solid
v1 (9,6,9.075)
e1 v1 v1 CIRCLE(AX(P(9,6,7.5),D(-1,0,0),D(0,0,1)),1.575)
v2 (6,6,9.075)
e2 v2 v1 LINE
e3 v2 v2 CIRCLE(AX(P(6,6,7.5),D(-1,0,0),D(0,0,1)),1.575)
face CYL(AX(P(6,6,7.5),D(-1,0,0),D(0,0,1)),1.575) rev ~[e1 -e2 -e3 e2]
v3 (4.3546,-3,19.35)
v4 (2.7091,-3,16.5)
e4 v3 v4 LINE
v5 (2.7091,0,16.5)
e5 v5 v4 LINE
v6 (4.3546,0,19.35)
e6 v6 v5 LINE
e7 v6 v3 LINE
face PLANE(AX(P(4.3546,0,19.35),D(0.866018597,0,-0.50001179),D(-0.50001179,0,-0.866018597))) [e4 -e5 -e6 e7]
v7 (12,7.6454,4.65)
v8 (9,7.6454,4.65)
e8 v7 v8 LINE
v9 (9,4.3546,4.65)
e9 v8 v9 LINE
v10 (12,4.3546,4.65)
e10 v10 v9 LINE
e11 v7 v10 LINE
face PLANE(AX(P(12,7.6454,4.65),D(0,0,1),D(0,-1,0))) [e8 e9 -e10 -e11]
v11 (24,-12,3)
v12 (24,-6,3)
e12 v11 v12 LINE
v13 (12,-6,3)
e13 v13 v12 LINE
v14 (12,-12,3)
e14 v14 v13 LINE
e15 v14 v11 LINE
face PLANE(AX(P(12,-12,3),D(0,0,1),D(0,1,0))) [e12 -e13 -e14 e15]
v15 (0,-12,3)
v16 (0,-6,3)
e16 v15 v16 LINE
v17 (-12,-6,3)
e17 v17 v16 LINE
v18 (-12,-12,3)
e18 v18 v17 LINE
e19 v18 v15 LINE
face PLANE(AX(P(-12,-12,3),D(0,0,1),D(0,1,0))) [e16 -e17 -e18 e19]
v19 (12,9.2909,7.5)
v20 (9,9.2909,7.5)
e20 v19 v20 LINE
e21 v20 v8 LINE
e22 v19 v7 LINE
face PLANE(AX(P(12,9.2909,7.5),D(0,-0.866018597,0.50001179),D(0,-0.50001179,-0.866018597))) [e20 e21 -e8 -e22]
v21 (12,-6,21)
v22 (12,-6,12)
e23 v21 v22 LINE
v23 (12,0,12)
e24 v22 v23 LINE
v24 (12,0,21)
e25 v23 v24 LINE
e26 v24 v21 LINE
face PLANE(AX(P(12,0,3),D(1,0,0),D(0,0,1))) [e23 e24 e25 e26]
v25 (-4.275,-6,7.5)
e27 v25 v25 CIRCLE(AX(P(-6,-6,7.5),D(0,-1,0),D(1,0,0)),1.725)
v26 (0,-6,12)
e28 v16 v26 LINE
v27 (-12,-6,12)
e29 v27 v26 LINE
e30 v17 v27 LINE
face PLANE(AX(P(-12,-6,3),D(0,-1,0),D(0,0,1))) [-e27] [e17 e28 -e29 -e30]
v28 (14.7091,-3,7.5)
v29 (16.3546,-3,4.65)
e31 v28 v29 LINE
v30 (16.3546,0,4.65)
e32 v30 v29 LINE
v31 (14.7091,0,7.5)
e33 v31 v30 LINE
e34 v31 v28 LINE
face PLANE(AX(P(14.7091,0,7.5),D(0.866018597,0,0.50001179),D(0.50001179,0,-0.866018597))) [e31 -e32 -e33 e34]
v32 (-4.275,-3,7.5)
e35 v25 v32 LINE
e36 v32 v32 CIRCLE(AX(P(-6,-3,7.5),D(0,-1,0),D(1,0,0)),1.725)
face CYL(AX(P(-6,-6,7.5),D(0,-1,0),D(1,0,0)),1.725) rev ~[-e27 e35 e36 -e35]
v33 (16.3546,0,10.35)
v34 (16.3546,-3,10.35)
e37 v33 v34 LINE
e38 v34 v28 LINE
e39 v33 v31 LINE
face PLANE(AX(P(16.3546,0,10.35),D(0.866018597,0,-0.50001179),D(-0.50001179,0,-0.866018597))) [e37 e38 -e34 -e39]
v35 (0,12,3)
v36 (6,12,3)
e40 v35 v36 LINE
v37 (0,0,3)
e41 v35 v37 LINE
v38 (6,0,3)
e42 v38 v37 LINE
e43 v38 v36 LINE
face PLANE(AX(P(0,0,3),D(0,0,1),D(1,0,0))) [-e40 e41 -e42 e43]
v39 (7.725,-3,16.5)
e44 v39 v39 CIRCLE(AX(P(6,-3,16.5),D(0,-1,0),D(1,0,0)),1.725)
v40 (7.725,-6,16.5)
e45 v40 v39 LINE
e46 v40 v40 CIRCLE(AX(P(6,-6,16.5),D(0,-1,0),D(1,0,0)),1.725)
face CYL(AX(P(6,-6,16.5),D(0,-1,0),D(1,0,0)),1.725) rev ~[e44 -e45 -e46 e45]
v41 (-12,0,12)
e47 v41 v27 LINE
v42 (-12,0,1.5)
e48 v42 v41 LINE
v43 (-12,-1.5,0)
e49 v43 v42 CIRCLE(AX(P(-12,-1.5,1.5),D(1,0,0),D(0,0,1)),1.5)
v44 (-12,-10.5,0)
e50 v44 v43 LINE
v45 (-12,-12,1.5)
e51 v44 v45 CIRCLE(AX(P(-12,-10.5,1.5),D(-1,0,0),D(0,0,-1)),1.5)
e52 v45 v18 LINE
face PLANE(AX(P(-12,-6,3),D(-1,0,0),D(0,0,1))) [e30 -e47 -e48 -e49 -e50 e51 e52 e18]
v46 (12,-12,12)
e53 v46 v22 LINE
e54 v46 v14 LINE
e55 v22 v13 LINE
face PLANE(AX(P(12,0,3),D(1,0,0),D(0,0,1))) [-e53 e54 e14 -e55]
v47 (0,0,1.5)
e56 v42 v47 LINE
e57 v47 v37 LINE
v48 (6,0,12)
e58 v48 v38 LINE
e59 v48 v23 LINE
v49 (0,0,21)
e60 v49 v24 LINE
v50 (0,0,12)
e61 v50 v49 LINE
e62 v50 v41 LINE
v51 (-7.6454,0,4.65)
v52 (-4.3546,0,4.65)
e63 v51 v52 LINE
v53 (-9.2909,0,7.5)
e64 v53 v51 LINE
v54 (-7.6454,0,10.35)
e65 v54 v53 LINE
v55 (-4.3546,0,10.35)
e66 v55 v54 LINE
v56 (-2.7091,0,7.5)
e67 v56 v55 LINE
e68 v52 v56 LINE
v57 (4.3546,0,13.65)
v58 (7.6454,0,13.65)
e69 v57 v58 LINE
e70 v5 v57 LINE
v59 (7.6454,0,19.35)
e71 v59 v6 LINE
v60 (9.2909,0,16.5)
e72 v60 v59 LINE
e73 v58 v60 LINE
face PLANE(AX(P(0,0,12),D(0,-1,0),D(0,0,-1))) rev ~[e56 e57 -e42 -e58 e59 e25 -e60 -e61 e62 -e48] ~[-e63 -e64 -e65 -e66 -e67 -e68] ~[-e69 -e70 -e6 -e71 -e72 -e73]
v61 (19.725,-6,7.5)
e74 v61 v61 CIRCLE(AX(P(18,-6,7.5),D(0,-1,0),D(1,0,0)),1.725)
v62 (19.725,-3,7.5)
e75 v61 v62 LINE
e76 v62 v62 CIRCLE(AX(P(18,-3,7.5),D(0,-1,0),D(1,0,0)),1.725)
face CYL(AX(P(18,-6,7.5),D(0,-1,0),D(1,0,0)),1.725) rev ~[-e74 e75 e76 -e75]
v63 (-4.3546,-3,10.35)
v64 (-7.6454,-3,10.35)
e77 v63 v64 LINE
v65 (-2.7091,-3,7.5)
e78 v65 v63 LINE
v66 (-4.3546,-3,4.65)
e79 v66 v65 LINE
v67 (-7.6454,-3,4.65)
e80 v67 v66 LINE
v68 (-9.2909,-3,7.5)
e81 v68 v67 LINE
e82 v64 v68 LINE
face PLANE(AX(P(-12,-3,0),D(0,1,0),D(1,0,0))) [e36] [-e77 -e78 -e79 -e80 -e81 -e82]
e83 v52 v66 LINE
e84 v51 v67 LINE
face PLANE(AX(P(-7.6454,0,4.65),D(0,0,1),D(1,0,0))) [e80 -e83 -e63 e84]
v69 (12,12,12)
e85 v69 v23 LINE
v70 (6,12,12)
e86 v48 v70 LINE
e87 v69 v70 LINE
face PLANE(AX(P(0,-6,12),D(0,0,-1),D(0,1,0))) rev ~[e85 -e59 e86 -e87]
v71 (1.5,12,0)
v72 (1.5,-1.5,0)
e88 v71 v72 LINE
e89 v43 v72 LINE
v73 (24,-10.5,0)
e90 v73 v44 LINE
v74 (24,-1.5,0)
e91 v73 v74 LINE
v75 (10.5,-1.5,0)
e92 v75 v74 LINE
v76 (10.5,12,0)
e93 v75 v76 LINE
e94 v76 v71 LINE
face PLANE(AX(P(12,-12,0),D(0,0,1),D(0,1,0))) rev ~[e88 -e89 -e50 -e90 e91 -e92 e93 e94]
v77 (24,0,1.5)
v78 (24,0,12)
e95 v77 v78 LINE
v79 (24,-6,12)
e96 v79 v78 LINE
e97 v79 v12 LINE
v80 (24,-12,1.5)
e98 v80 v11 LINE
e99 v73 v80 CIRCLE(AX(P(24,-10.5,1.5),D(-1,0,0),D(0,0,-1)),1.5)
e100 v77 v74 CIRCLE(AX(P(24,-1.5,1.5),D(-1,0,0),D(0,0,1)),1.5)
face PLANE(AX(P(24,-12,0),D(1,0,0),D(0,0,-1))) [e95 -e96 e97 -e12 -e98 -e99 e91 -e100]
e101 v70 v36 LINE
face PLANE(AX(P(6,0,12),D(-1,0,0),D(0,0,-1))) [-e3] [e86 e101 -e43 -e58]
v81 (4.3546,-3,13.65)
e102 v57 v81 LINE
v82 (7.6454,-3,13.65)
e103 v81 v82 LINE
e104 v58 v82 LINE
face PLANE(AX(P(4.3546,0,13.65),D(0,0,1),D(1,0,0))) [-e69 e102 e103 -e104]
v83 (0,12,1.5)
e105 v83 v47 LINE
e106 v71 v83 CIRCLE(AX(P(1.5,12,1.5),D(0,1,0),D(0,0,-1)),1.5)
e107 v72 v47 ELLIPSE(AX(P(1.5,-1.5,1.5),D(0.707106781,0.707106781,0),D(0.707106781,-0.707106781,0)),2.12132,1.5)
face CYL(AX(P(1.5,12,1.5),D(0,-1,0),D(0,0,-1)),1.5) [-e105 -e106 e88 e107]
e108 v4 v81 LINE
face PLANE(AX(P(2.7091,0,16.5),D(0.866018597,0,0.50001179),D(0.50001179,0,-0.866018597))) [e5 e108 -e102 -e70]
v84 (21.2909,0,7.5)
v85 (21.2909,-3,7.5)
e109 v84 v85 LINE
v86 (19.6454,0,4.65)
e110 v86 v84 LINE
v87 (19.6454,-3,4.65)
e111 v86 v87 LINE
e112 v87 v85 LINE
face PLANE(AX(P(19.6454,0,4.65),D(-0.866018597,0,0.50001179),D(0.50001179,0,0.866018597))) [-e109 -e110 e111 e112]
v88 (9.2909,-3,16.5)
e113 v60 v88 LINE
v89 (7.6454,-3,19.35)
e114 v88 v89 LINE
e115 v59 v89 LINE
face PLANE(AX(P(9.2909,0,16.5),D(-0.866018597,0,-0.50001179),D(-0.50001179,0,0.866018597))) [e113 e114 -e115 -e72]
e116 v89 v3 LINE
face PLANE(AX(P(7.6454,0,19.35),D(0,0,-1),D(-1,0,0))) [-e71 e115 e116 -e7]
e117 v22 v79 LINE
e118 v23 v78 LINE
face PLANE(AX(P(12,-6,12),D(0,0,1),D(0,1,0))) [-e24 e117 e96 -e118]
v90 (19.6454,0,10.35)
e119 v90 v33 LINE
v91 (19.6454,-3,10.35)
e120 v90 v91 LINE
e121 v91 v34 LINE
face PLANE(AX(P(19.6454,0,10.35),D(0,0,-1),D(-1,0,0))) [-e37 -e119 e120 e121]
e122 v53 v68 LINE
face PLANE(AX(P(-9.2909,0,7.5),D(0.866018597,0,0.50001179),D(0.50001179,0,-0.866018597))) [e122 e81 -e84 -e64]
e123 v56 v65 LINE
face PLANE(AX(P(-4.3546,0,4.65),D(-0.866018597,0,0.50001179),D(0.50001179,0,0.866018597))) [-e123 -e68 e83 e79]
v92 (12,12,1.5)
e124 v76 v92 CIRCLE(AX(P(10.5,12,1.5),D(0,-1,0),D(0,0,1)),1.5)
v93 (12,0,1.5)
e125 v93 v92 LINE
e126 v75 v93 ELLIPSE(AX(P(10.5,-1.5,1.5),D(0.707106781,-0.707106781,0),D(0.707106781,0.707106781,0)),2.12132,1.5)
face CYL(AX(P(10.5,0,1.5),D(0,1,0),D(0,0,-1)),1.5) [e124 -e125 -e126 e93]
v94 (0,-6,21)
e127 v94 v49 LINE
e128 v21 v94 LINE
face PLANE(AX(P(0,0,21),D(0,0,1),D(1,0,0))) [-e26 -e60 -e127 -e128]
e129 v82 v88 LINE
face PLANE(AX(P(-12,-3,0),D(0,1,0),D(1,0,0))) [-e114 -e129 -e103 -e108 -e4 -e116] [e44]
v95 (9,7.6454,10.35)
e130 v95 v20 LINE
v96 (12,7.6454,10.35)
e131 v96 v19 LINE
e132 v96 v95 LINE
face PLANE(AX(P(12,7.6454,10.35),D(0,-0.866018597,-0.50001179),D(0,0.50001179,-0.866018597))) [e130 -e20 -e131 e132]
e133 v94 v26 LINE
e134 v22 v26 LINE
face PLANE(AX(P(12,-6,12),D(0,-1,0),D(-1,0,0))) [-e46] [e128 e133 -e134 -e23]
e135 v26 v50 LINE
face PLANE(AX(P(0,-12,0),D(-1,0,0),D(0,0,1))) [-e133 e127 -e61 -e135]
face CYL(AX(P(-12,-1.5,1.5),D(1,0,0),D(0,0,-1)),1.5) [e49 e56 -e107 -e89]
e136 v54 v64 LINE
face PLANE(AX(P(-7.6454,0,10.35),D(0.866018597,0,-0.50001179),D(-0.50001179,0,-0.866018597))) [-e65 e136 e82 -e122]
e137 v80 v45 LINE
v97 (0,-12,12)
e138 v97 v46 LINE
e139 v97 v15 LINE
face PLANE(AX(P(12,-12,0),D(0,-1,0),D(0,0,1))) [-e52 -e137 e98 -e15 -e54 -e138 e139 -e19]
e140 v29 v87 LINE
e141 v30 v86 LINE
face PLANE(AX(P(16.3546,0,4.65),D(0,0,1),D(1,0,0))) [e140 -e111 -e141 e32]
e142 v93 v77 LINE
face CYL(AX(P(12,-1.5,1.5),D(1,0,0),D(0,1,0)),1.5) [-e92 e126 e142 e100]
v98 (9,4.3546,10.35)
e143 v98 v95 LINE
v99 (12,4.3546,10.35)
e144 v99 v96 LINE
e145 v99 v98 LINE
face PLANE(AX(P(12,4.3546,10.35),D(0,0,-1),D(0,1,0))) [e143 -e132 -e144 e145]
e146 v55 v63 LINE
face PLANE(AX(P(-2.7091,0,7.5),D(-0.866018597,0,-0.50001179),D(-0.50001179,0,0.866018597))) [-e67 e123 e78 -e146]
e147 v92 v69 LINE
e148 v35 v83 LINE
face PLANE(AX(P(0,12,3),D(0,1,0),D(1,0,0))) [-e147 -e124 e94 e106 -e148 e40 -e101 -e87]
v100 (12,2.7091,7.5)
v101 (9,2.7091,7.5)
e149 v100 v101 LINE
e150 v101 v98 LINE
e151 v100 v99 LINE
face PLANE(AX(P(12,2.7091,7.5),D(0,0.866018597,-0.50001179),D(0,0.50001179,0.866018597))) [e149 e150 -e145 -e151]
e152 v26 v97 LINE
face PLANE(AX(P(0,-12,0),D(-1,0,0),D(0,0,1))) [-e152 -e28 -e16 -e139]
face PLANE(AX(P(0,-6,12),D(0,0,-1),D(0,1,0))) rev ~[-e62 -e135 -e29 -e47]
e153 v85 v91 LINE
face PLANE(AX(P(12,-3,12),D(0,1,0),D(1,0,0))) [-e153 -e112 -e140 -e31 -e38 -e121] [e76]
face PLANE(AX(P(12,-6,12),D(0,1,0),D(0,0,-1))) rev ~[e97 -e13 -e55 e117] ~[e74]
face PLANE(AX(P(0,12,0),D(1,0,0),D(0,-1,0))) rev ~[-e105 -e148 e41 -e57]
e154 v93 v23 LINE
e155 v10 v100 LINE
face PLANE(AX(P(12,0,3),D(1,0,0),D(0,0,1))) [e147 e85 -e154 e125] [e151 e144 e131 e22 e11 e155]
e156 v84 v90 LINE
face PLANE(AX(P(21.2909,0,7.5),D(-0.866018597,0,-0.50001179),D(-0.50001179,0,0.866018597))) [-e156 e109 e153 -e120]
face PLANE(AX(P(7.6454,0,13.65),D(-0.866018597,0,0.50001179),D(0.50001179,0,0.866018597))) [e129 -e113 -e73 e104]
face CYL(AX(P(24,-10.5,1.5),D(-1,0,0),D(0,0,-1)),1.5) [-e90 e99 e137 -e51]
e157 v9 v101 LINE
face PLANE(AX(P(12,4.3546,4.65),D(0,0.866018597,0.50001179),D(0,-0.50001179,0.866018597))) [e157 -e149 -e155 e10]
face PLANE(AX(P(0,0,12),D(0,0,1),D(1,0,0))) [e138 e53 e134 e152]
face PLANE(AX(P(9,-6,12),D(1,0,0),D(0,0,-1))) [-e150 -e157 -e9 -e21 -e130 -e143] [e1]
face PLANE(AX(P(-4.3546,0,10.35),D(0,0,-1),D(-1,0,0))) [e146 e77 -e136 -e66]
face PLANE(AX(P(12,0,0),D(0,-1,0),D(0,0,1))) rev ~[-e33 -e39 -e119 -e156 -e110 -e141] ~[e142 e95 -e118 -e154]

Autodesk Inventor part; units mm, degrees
ref_plane "YZ Plane" through (0, 0, 0) normal (1, 0, 0) x (0, 1, 0)
ref_plane "XZ Plane" through (0, 0, 0) normal (0, 1, 0) x (-1, 0, 0)
ref_plane "XY Plane" through (0, 0, 0) normal (0, 0, 1) x (1, 0, 0)
sketch "Sketch1" plane through (0, 0, 0) normal (0, 0, 1) x (1, 0, 0)
  line L0 (0, 0) -> (12, 0)
  line L1 (12, 0) -> (12, 12)
  line L2 (12, 12) -> (0, 12)
  line L3 (0, 12) -> (0, 0)
  line L4 (12, 0) -> (0, 0)
  line L5 (0, 0) -> (0, -12)
  line L6 (0, -12) -> (12, -12)
  line L7 (12, -12) -> (12, 0)
  line L8 (12, 0) -> (24, 0)
  line L9 (24, 0) -> (24, -12)
  line L10 (24, -12) -> (12, -12)
  line L11 (12, -12) -> (12, 0)
  line L12 (0, -12) -> (-12, -12)
  line L13 (-12, -12) -> (-12, 0)
  line L14 (-12, 0) -> (0, 0)
  line L15 (0, 0) -> (0, -12)
  line L16 (0, -12) -> (12, -12)
  line L17 (12, -12) -> (12, -24)
  line L18 (12, -24) -> (0, -24)
  line L19 (0, -24) -> (0, -12)
  dimension "d0" = 12
  dimension "d1" = 12
  dimension "d2" = 12
  dimension "d3" = 12
  dimension "d4" = 12
  dimension "d5" = 12
  dimension "d6" = 12
  dimension "d7" = 12
  dimension "d8" = 12
  dimension "d9" = 12
extrude "Extrusion1" add sketch "Sketch1" along normal blind 3
sketch "Sketch2" plane through (0, 0, 3) normal (0, 0, 1) x (1, 0, 0)
  line L0 (-12, 0) -> (-12, -12) projected
  line L1 (-12, -12) -> (-12, -6)
  line L2 (-12, -6) -> (0, -6)
  line L3 (-12, -12) -> (0, -12) projected
  line L4 (0, -6) -> (0, -12)
  line L5 (0, -12) -> (-12, -12)
  line L6 (12, -24) -> (12, -12) projected
  line L7 (12, -12) -> (12, -6)
  line L8 (12, -6) -> (24, -6)
  line L9 (24, -12) -> (24, 0) projected
  line L10 (12, -12) -> (24, -12) projected
  line L11 (24, -6) -> (24, -12)
  line L12 (24, -12) -> (12, -12)
  line L13 (0, 0) -> (0, -6)
  line L14 (12, 0) -> (12, 12) projected
  line L15 (0, 0) -> (12, 0)
  line L16 (12, 0) -> (12, -6)
  line L17 (12, -12) -> (0, -12)
  line L18 (0, 12) -> (0, 0) projected
  line L19 (0, 0) -> (0, 12)
  line L20 (0, 12) -> (6, 12)
  line L21 (12, 12) -> (0, 12) projected
  line L22 (6, 12) -> (6, 0)
  line L23 (6, 0) -> (0, 0)
  line L24 (0, -12) -> (0, -24) projected
  line L25 (0, -12) -> (0, -24)
  line L26 (0, -24) -> (6, -24)
  line L27 (0, -24) -> (12, -24) projected
  line L28 (6, -24) -> (6, -12)
  line L29 (6, -12) -> (0, -12)
  dimension "d12" = 6
  dimension "d13" = 12
extrude "Extrusion2" add sketch "Sketch2" along normal blind 9 contours L2 L4 L3 L0 | L13 L15 L16 L7 L17 L4 | L17 L28 L26 L24 | L18 L20 L22 L15 | L7 L8 L9 L10
sketch "Sketch3" plane through (0, 0, 12) normal (0, 0, 1) x (1, 0, 0)
  line L0 (0, -6) -> (12, -6)
  line L1 (12, -12) -> (6, -12) projected
  line L2 (12, -6) -> (12, -12)
  line L3 (0, -12) -> (0, -24) projected
  line L4 (12, -12) -> (0, -12)
  line L5 (0, -12) -> (0, -6)
  point P0 (0, 0)
extrude "Extrusion3" add sketch "Sketch3" along normal blind 9
sketch "Sketch4" plane through (6, -12, 3) normal (0, -1, 0) x (1, 0, 0)
  point P0 (-6, -3)
sketch "Sketch5" plane through (-12, -6, 3) normal (0, 1, 0) x (1, 0, 0)
  circle A0 centre (6, -4.5) radius 1.725
  line L0 (0, 0) -> (0, -9) projected
  line L1 (12, -9) -> (0, -9) projected
  circle A1 centre (18, -13.5) radius 1.725
  line L2 (24, -18) -> (12, -18) projected
  line L3 (24, -9) -> (24, -18) projected
  circle A2 centre (30, -4.5) radius 1.725
  line L4 (36, 0) -> (36, -9) projected
  line L5 (36, -9) -> (24, -9) projected
  point P0 (12, 3)
  dimension "d19" = 3.45
  dimension "d20" = 6
  dimension "d21" = 4.5
  dimension "d22" = 3.45
  dimension "d23" = 4.5
  dimension "d24" = 6
  dimension "d25" = 3.45
  dimension "d26" = 6
  dimension "d27" = 4.5
extrude "Extrusion4" cut sketch "Sketch5" against normal blind 3
sketch "Sketch6" plane through (6, -12, 3) normal (0, -1, 0) x (1, 0, 0)
  circle A0 centre (-12, 4.5) radius 1.725 projected
  line L0 (-10.3546, 7.35) -> (-8.7091, 4.5)
  line L1 (-8.7091, 4.5) -> (-10.3546, 1.65)
  line L2 (-10.3546, 1.65) -> (-13.6454, 1.65)
  line L3 (-13.6454, 1.65) -> (-15.2909, 4.5)
  line L4 (-15.2909, 4.5) -> (-13.6454, 7.35)
  line L5 (-13.6454, 7.35) -> (-10.3546, 7.35)
  circle A1 centre (12, 4.5) radius 1.725 projected
  line L6 (13.6454, 7.35) -> (15.2909, 4.5)
  line L7 (15.2909, 4.5) -> (13.6454, 1.65)
  line L8 (13.6454, 1.65) -> (10.3546, 1.65)
  line L9 (10.3546, 1.65) -> (8.7091, 4.5)
  line L10 (8.7091, 4.5) -> (10.3546, 7.35)
  line L11 (10.3546, 7.35) -> (13.6454, 7.35)
  circle A2 centre (0, 13.5) radius 1.725 projected
  line L12 (1.6454, 16.35) -> (3.2909, 13.5)
  line L13 (3.2909, 13.5) -> (1.6454, 10.65)
  line L14 (1.6454, 10.65) -> (-1.6454, 10.65)
  line L15 (-1.6454, 10.65) -> (-3.2909, 13.5)
  line L16 (-3.2909, 13.5) -> (-1.6454, 16.35)
  line L17 (-1.6454, 16.35) -> (1.6454, 16.35)
  point P0 (-6, -3)
  dimension "d30" = 2.85
  dimension "d31" = 2.85
  dimension "d32" = 2.85
extrude "Extrusion5" cut sketch "Sketch6" against normal blind 3 contours A0 | L0 L1 L2 L3 L4 L5 | A1 | L6 L7 L8 L9 L10 L11 | A2 | L12 L13 L14 L15 L16 L17
sketch "Sketch7" plane through (6, 0, 3) normal (1, 0, 0) x (0, 0, -1)
  circle A0 centre (-4.5, 6) radius 1.725
  circle A1 centre (-4.5, -18) radius 1.725
  line L0 (-9, 0) -> (-9, 12) projected
  line L1 (-9, -24) -> (-9, -12) projected
  line L2 (0, -24) -> (-9, -24) projected
  line L3 (0, 12) -> (-9, 12) projected
  point P0 (3, 0)
  dimension "d35" = 3.45
  dimension "d36" = 3.45
  dimension "d37" = 4.5
  dimension "d38" = 4.5
  dimension "d39" = 6
  dimension "d40" = 6
extrude "Extrusion6" cut sketch "Sketch7" against normal blind 3
sketch "Sketch8" plane through (0, -6, 3) normal (-1, 0, 0) x (0, 0, 1)
  circle A0 centre (4.5, 12) radius 1.725 projected
  line L0 (1.65, 13.6454) -> (4.5, 15.2909)
  line L1 (4.5, 15.2909) -> (7.35, 13.6454)
  line L2 (7.35, 13.6454) -> (7.35, 10.3546)
  line L3 (7.35, 10.3546) -> (4.5, 8.7091)
  line L4 (4.5, 8.7091) -> (1.65, 10.3546)
  line L5 (1.65, 10.3546) -> (1.65, 13.6454)
  circle A1 centre (4.5, -12) radius 1.725 projected
  line L6 (1.65, -10.3546) -> (4.5, -8.7091)
  line L7 (4.5, -8.7091) -> (7.35, -10.3546)
  line L8 (7.35, -10.3546) -> (7.35, -13.6454)
  line L9 (7.35, -13.6454) -> (4.5, -15.2909)
  line L10 (4.5, -15.2909) -> (1.65, -13.6454)
  line L11 (1.65, -13.6454) -> (1.65, -10.3546)
  point P0 (-3, 6)
  dimension "d43" = 2.85
  dimension "d44" = 2.85
extrude "Extrusion7" cut sketch "Sketch8" against normal blind 3 contours A0 | L0 L1 L2 L3 L4 L5 | A1 | L6 L7 L8 L9 L10 L11
sketch "Sketch9" plane through (0, 0, 0) normal (0, 0, -1) x (-1, 0, 0)
  line L0 (-24, -12) -> (-24, 0) projected
  line L1 (-12, -12) -> (-12, -6) projected
  line L2 (-24, 0) -> (-12, 0)
  line L3 (-12, 0) -> (-12, -12)
  line L4 (-12, -12) -> (-24, -12)
  line L5 (-24, -12) -> (-24, 0)
  line L6 (-12, -12) -> (0, -12)
  line L7 (0, -12) -> (0, -24)
  line L8 (0, -24) -> (-12, -24)
  line L9 (-12, -24) -> (-12, -12)
  point P0 (0, 0)
extrude "Extrusion8" cut sketch "Sketch9" against normal through all
sketch "Sketch10" plane through (0, 12, 12) normal (0, 1, 0) x (1, 0, 0)
  line L0 (6, 0) -> (0, 0) projected
  line L1 (12, 9) -> (6, 9) projected
  line L2 (0, 0) -> (6, 0)
  line L3 (6, 0) -> (6, 9)
  line L4 (6, 9) -> (0, 9)
  line L5 (0, 9) -> (0, 0)
  point P0 (0, 12)
extrude "Extrusion9" cut sketch "Sketch10" against normal blind 12
sketch "Sketch11" plane through (0, 0, 3) normal (0, 1, 0) x (1, 0, 0)
  line L0 (12, 0) -> (12, -9) projected
  line L1 (12, 0) -> (0, 0) projected
  line L2 (12, -9) -> (6, -9)
  line L3 (6, -9) -> (6, 0)
  line L4 (6, 0) -> (12, 0)
  line L5 (12, 0) -> (12, -9)
  point P0 (0, 3)
extrude "Extrusion10" add sketch "Sketch11" along normal blind 12
sketch "Sketch12" plane through (6, 0, 3) normal (-1, 0, 0) x (0, 0, 1)
  circle A0 centre (4.5, 6) radius 1.575
  line L0 (9, 0) -> (9, 12) projected
  line L1 (0, 12) -> (9, 12) projected
  point P0 (-3, 0)
  dimension "d54" = 3.15
  dimension "d55" = 4.5
  dimension "d56" = 6
extrude "Extrusion11" cut sketch "Sketch12" against normal blind 3
sketch "Sketch13" plane through (12, -6, 12) normal (1, 0, 0) x (0, 0, -1)
  circle A0 centre (4.5, 12) radius 1.575 projected
  line L0 (1.65, 13.6454) -> (4.5, 15.2909)
  line L1 (4.5, 15.2909) -> (7.35, 13.6454)
  line L2 (7.35, 13.6454) -> (7.35, 10.3546)
  line L3 (7.35, 10.3546) -> (4.5, 8.7091)
  line L4 (4.5, 8.7091) -> (1.65, 10.3546)
  line L5 (1.65, 10.3546) -> (1.65, 13.6454)
  point P0 (12, 6)
  dimension "d59" = 5.7
extrude "Extrusion12" cut sketch "Sketch13" against normal blind 3 contours A0 | L0 L1 L2 L3 L4 L5
sketch "Sketch14" plane through (0, -6, 3) normal (-1, 0, 0) x (0, 0, 1)
  line L0 (9, 6) -> (0, 6) projected
  line L1 (0, 6) -> (0, 0) projected
  line L2 (9, 6) -> (0, 6)
  line L3 (0, 6) -> (0, 0)
  line L4 (0, 0) -> (9, 0)
  line L5 (9, 0) -> (9, 6)
  point P0 (-3, 6)
extrude "Extrusion13" add sketch "Sketch14" along normal blind 12
sketch "Sketch15" plane through (-12, -12, 0) normal (-1, 0, 0) x (0, 0, 1)
  line L0 (12, 0) -> (12, 6) projected
  line L1 (12, 0) -> (3, 0)
  line L2 (3, 0) -> (3, 6)
  line L3 (3, 6) -> (12, 6)
  line L4 (12, 6) -> (12, 0)
  point P0 (0, 12)
  dimension "d64" = 9
  dimension "d65" = 6
extrude "Extrusion14" cut sketch "Sketch15" against normal blind 12
sketch "Sketch16" plane through (-12, -6, 12) normal (0, -1, 0) x (1, 0, 0)
  circle A0 centre (6, -4.5) radius 1.725
  line L0 (0, -9) -> (0, 0) projected
  line L1 (0, 0) -> (12, 0) projected
  point P0 (12, -12)
  dimension "d68" = 3.45
  dimension "d69" = 6
  dimension "d70" = 4.5
extrude "Extrusion15" cut sketch "Sketch16" against normal blind 3
sketch "Sketch17" plane through (-12, 0, 0) normal (0, 1, 0) x (1, 0, 0)
  circle A0 centre (6, -7.5) radius 1.725 projected
  line L0 (4.3546, -10.35) -> (2.7091, -7.5)
  line L1 (2.7091, -7.5) -> (4.3546, -4.65)
  line L2 (4.3546, -4.65) -> (7.6454, -4.65)
  line L3 (7.6454, -4.65) -> (9.2909, -7.5)
  line L4 (9.2909, -7.5) -> (7.6454, -10.35)
  line L5 (7.6454, -10.35) -> (4.3546, -10.35)
  point P0 (12, 0)
  dimension "d73" = 5.7
extrude "Extrusion16" cut sketch "Sketch17" against normal blind 3 contours A0 | L0 L1 L2 L3 L4 L5
sketch "Sketch18" plane through (0, 0, 12) normal (0, 0, 1) x (1, 0, 0)
  line L0 (12, -6) -> (12, 12) projected
  line L1 (0, 0) -> (12, 0)
  line L2 (12, 0) -> (12, -6)
  line L3 (12, -6) -> (0, -6)
  line L4 (0, -6) -> (0, 0)
extrude "Extrusion17" add sketch "Sketch18" along normal blind 9
sketch "Sketch19" plane through (0, 0, 21) normal (0, 0, 1) x (1, 0, 0)
  line L0 (0, -12) -> (12, -12) projected
  line L1 (12, -12) -> (12, 0) projected
  line L2 (0, -12) -> (12, -12)
  line L3 (12, -12) -> (12, -6)
  line L4 (12, -6) -> (0, -6)
  line L5 (0, -6) -> (0, -12)
  point P0 (0, 0)
extrude "Extrusion18" cut sketch "Sketch19" against normal blind 9
sketch "Sketch20" plane through (0, -6, 21) normal (0, -1, 0) x (1, 0, 0)
  circle A0 centre (6, -4.5) radius 1.725
  line L0 (0, 0) -> (12, 0) projected
  line L1 (0, -9) -> (0, 0) projected
  point P0 (0, -21)
  dimension "d80" = 3.45
  dimension "d81" = 4.5
  dimension "d82" = 6
extrude "Extrusion19" cut sketch "Sketch20" against normal blind 3
sketch "Sketch21" plane through (-12, 0, 0) normal (0, 1, 0) x (1, 0, 0)
  circle A0 centre (18, -16.5) radius 1.725 projected
  line L0 (16.3546, -19.35) -> (14.7091, -16.5)
  line L1 (14.7091, -16.5) -> (16.3546, -13.65)
  line L2 (16.3546, -13.65) -> (19.6454, -13.65)
  line L3 (19.6454, -13.65) -> (21.2909, -16.5)
  line L4 (21.2909, -16.5) -> (19.6454, -19.35)
  line L5 (19.6454, -19.35) -> (16.3546, -19.35)
  point P0 (12, 0)
  dimension "d85" = 5.7
extrude "Extrusion20" cut sketch "Sketch21" against normal blind 3 contours A0 | L0 L1 L2 L3 L4 L5
sketch "Sketch22" plane through (12, -12, 0) normal (1, 0, 0) x (0, 0, -1)
  line L0 (-12, 6) -> (-12, 12) projected
  line L1 (0, 24) -> (0, 12) projected
  line L2 (-12, 6) -> (-3, 6)
  line L3 (0, 0) -> (0, 12)
  line L4 (0, 12) -> (-12, 12)
  line L5 (-12, 12) -> (-12, 6)
  line L6 (0, 0) -> (-12, 0) projected
  line L7 (-3, 6) -> (-12, 6) projected
  line L8 (0, 0) -> (-3, 0)
  line L9 (-3, 0) -> (-3, 6)
  line L10 (0, 12) -> (0, 0)
extrude "Extrusion21" add sketch "Sketch22" along normal blind 12
sketch "Sketch23" plane through (12, -6, 3) normal (0, -1, 0) x (1, 0, 0)
  circle A0 centre (6, 4.5) radius 1.725
  line L0 (0, 9) -> (12, 9) projected
  line L1 (12, 9) -> (12, 0) projected
  point P0 (-12, -3)
  dimension "d91" = 3.45
  dimension "d92" = 4.5
  dimension "d93" = 6
extrude "Extrusion22" cut sketch "Sketch23" against normal blind 3
sketch "Sketch24" plane through (12, 0, 12) normal (0, 1, 0) x (1, 0, 0)
  circle A0 centre (6, 4.5) radius 1.725 projected
  line L0 (4.3546, 1.65) -> (2.7091, 4.5)
  line L1 (2.7091, 4.5) -> (4.3546, 7.35)
  line L2 (4.3546, 7.35) -> (7.6454, 7.35)
  line L3 (7.6454, 7.35) -> (9.2909, 4.5)
  line L4 (9.2909, 4.5) -> (7.6454, 1.65)
  line L5 (7.6454, 1.65) -> (4.3546, 1.65)
  point P0 (-12, 12)
  dimension "d96" = 5.7
extrude "Extrusion23" cut sketch "Sketch24" against normal blind 3 contours A0 | L0 L1 L2 L3 L4 L5
fillet "Fillet4" radius 1.5 5 edges at (6, -12, 0) (-6, 0, 0) (0, 6, 0) (12, 6, 0) (18, 0, 0)
properties part number "topthreewayESW"
